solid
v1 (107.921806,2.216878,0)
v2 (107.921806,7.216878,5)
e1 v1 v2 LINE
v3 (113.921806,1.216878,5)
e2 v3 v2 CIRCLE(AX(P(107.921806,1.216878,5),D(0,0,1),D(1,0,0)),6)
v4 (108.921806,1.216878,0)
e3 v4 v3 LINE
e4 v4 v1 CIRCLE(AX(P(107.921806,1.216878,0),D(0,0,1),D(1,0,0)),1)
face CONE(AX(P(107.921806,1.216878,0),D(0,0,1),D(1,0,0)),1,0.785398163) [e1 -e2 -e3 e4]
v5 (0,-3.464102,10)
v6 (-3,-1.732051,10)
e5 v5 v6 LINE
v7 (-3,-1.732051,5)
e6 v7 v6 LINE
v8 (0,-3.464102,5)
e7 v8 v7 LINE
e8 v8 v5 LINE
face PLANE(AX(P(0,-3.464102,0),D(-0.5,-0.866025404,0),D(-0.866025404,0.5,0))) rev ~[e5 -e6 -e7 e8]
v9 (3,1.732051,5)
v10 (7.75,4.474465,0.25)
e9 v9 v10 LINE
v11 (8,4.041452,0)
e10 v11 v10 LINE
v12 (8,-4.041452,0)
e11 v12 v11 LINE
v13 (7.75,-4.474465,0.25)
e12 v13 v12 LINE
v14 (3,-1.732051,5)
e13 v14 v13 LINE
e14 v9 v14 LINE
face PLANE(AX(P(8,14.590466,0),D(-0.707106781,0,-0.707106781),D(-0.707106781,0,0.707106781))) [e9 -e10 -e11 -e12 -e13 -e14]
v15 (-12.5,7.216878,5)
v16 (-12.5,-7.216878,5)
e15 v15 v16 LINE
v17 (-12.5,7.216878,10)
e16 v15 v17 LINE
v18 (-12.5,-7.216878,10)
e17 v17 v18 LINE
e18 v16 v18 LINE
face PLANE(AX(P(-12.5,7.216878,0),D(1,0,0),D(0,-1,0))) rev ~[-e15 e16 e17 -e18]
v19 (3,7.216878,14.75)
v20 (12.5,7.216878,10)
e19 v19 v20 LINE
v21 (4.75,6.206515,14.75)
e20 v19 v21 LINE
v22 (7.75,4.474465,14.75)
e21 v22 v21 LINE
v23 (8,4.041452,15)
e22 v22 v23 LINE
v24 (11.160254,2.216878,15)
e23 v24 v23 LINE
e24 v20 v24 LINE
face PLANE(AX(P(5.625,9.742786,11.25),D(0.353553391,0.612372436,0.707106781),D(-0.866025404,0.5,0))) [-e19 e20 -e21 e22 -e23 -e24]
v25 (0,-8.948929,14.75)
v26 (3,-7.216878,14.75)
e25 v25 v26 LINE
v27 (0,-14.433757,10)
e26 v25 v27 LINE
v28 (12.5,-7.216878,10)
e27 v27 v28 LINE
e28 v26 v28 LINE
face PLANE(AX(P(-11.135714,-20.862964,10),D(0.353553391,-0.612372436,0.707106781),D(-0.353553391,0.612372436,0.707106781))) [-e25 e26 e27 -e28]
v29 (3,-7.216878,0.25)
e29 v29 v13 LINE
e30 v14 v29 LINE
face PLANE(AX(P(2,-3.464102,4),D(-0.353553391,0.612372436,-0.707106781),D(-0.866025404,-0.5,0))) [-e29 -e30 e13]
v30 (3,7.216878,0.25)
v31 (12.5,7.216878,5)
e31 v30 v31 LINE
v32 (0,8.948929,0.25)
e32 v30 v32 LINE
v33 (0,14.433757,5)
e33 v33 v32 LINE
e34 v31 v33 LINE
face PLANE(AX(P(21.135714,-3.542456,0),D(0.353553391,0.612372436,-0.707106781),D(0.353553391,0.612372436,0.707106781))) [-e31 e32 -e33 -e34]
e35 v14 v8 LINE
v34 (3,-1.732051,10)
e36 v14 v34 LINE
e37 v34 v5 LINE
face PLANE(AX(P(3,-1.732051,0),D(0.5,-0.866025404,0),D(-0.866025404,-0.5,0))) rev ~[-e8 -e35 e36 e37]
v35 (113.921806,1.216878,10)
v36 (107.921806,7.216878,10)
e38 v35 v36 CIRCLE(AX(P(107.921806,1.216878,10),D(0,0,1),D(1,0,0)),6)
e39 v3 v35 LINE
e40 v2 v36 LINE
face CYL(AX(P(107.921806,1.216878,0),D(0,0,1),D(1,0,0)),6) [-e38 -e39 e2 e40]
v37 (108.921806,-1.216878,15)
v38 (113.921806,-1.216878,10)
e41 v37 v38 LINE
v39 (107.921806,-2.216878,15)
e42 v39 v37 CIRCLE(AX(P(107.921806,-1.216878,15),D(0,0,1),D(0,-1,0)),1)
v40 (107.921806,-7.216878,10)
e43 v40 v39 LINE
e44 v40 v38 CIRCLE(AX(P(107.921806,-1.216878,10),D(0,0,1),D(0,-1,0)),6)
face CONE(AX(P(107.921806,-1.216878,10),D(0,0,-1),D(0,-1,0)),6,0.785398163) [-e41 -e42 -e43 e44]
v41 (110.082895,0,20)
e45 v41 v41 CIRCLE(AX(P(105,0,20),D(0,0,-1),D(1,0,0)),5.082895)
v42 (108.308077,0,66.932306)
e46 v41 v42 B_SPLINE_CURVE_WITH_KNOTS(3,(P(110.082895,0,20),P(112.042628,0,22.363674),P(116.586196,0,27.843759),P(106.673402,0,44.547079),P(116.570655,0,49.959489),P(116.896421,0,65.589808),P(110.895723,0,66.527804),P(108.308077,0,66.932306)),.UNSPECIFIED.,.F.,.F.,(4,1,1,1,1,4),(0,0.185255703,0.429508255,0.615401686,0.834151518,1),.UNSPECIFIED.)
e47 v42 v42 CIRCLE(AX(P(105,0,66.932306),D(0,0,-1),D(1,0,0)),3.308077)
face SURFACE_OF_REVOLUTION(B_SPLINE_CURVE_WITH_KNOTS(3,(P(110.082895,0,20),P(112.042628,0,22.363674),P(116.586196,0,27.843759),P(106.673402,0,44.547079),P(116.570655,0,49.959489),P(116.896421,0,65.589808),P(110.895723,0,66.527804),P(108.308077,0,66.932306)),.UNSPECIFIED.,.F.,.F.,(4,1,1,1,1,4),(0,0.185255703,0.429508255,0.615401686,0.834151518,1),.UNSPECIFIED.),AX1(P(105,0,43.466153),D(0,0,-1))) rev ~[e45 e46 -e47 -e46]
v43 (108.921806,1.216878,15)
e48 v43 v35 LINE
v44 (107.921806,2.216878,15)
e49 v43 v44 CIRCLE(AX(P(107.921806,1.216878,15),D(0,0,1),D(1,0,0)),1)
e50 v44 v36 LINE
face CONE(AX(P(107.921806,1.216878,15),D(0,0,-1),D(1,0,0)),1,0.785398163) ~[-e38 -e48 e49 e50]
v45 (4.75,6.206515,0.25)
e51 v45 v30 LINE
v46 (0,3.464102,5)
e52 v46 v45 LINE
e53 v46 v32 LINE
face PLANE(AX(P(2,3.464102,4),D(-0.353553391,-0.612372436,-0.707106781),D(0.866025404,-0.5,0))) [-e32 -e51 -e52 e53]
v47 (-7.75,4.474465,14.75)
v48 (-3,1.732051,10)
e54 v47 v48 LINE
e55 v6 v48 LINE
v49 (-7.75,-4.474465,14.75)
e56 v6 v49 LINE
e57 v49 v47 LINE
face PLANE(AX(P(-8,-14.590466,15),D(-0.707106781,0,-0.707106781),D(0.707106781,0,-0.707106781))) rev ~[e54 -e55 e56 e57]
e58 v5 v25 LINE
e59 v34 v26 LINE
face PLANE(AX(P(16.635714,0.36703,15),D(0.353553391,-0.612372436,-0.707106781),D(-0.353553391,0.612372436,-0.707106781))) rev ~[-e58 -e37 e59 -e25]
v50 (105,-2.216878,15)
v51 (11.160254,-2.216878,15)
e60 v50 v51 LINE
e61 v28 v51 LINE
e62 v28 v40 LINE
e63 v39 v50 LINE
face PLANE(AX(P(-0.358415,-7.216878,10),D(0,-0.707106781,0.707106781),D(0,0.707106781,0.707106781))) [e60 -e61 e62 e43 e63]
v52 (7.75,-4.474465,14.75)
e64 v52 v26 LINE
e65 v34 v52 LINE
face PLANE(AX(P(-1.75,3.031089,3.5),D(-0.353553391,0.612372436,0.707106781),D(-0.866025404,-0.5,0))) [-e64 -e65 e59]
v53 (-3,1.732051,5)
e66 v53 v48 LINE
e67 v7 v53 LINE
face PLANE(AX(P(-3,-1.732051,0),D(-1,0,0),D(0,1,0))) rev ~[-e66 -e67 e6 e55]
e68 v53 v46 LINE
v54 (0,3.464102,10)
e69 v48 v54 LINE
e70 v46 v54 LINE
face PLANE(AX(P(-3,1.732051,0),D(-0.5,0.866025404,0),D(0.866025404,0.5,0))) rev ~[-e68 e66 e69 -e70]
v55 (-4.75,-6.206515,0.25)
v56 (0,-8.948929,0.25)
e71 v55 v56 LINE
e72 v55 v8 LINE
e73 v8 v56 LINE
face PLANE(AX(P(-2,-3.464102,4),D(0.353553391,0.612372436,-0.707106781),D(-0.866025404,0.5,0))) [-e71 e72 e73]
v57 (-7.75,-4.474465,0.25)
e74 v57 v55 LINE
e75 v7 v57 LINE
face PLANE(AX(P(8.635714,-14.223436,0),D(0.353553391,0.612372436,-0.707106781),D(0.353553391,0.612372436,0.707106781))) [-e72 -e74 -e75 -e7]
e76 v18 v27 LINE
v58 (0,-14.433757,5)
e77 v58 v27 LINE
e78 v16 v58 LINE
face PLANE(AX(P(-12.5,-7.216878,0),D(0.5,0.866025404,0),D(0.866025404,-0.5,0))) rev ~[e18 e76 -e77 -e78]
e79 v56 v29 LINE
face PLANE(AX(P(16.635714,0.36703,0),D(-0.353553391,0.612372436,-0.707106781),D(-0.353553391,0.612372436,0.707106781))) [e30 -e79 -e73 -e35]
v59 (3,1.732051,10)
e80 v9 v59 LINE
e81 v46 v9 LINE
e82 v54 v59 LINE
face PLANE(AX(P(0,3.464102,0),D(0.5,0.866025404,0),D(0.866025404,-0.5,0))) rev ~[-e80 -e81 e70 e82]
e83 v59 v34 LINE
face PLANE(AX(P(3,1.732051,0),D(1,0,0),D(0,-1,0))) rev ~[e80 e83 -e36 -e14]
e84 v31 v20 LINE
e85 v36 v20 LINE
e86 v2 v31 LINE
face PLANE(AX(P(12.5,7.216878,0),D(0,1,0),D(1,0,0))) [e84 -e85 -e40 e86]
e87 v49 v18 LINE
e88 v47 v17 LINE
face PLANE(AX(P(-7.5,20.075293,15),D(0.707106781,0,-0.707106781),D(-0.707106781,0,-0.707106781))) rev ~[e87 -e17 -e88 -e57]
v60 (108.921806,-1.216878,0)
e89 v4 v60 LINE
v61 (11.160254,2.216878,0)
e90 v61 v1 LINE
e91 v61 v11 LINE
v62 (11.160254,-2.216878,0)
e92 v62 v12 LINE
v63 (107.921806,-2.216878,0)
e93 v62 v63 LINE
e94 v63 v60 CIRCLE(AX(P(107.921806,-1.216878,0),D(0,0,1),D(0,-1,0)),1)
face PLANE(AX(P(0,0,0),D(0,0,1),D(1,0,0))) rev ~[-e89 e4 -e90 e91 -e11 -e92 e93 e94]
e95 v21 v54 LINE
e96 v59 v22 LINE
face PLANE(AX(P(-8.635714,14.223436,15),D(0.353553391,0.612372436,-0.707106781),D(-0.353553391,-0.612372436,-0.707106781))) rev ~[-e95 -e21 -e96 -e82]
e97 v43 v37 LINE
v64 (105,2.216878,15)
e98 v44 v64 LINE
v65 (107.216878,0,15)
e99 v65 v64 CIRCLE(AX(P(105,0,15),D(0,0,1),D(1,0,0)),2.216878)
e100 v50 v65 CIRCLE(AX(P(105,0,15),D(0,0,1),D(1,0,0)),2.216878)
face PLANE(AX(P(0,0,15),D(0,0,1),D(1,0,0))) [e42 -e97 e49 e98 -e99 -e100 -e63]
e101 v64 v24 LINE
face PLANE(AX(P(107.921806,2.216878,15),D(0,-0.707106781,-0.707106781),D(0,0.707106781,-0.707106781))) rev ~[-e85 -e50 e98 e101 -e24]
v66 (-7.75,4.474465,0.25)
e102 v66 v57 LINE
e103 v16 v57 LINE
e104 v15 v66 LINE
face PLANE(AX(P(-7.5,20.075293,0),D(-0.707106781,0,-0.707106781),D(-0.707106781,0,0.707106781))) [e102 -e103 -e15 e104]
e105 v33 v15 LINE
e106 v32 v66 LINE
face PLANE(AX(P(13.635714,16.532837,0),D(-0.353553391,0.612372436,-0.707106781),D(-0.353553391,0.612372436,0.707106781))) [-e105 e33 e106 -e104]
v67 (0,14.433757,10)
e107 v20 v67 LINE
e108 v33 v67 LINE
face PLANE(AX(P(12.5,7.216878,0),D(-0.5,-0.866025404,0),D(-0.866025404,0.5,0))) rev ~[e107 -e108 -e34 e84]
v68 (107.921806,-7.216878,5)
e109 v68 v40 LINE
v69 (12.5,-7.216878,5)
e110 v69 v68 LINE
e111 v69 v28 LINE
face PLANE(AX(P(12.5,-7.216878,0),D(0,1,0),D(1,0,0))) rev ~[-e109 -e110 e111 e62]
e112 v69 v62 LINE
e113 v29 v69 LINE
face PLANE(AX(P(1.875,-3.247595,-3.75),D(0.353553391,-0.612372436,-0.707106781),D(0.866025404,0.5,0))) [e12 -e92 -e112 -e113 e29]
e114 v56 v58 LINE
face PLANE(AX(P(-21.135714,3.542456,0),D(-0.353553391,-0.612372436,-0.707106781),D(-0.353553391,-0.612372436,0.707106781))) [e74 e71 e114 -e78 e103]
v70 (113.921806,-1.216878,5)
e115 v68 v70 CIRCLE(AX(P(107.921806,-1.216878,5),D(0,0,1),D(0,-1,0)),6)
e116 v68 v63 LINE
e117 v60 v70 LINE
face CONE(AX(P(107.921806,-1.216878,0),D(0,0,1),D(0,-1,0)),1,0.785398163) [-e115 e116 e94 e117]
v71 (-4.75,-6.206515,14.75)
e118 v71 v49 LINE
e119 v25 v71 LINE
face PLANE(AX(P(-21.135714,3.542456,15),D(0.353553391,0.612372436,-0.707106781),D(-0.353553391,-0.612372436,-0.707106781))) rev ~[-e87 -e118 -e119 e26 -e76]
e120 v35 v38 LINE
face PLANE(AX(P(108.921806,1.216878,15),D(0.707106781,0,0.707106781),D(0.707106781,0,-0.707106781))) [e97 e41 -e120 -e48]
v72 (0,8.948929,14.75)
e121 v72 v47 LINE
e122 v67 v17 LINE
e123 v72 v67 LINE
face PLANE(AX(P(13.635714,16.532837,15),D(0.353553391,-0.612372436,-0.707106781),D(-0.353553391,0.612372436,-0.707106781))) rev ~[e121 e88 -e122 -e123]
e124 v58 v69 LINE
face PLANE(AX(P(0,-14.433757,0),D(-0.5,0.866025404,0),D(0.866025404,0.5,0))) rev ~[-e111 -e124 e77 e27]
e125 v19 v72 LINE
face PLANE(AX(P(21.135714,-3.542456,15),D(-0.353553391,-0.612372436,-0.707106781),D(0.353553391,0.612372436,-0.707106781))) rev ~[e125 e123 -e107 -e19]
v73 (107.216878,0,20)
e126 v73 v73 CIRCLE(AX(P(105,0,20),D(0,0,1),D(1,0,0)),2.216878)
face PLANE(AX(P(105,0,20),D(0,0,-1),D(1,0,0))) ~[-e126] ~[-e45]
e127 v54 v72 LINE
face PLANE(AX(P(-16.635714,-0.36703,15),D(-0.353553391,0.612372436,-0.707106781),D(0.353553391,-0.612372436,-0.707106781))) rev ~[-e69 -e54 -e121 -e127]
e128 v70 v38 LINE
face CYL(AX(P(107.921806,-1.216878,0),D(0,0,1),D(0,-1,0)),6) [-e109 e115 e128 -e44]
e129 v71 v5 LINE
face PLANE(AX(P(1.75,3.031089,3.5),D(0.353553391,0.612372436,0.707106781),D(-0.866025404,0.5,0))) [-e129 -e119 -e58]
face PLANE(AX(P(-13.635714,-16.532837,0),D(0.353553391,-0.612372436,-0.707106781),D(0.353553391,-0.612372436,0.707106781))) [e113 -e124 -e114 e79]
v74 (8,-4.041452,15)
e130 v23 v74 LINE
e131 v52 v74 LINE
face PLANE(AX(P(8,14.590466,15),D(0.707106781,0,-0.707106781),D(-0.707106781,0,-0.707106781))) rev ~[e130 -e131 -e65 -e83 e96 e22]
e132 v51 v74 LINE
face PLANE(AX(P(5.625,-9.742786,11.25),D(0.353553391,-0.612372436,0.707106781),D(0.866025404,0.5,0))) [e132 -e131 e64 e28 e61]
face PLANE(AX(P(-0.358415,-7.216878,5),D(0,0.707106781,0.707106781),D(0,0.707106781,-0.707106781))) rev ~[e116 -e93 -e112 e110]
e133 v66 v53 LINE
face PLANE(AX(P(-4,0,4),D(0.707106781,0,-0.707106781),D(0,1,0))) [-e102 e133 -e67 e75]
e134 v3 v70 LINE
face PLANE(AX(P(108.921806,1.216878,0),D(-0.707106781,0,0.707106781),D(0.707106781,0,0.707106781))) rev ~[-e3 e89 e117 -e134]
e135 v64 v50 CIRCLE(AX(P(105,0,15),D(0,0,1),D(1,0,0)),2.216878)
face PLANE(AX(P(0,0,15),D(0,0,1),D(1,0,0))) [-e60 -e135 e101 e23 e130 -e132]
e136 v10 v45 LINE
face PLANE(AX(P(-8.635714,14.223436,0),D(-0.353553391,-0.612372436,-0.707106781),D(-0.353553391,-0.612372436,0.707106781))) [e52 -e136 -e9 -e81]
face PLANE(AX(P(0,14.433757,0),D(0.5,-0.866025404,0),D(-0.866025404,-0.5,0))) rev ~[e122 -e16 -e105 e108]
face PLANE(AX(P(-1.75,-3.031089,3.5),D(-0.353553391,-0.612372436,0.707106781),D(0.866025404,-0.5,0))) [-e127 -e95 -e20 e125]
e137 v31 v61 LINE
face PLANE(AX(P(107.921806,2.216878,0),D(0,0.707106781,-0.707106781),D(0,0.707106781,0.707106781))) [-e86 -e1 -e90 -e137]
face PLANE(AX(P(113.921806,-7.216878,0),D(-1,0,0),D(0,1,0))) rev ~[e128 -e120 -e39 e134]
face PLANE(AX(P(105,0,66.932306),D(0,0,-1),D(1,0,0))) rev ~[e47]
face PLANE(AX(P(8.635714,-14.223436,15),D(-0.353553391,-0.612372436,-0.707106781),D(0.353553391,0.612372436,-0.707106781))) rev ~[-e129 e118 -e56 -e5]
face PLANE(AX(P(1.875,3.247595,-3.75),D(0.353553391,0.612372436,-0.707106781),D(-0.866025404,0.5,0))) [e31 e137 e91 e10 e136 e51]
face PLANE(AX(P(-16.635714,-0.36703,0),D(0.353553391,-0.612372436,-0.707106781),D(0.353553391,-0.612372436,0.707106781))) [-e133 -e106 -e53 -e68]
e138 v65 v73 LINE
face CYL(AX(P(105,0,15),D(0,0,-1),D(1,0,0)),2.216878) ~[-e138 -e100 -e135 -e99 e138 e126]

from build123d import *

# Parameters (mm, degrees)
F0_W          = 101.4218062162
F0_H          = 14.4337567297
F1_DEPTH      = 15
F2_R          = 6
F3_T1_DEPTH   = 2.4337567297
F3_T3_DEPTH   = 40.1505866094
F3_T5_DEPTH   = 40.1505866094
F3_T7_DEPTH   = 40.1505866094
F3_T12_DEPTH  = 108.2802211561
F3_T17_DEPTH  = 108.2802211561
F3_T20_ANGLE  = 90
F3_T24_DEPTH  = 40.1505866094
F3_T27_ANGLE  = 90
F3_T31_DEPTH  = 108.2802211561
F3_T36_DEPTH  = 108.2802211561
F3_T41_DEPTH  = 40.1505866094
F3_T46_DEPTH  = 29.1809314948
F3_T52_DEPTH  = 29.1809314948
F3_T58_DEPTH  = 29.1809314948
F3_T64_DEPTH  = 29.1809314948
F3_T70_DEPTH  = 29.1809314948
F3_T76_DEPTH  = 29.1809314948
F3_T82_DEPTH  = 108.2802211561
F3_T87_DEPTH  = 108.2802211561
F3_T90_ANGLE  = 90
F3_T94_DEPTH  = 40.1505866094
F3_T97_ANGLE  = 90
F3_T101_DEPTH = 108.2802211561
F3_T106_DEPTH = 108.2802211561
F3_T111_DEPTH = 40.1505866094
F3_T116_DEPTH = 29.1809314948
F3_T122_DEPTH = 29.1809314948
F3_T128_DEPTH = 29.1809314948
F3_T134_DEPTH = 29.1809314948
F3_T140_DEPTH = 29.1809314948
F3_T146_DEPTH = 29.1809314948
F4_R          = 2.2168783649
F5_DEPTH      = 5


# Not quite as in the source:
# - a fillet or chamfer that OpenCascade refuses, or shapes differently, is made with other operations: its cross-section is extruded or revolved along the edge and cut away or added


with BuildPart() as f1:
    # F0 (on Top) → F1 (new body)
    with BuildSketch(Plane.XY):
        Polygon((12.5, -7.2168783649), (12.5, 7.2168783649), (0, 14.4337567297), (-12.5, 7.2168783649), (-12.5, -7.2168783649), (0, -14.4337567297), align=None)
        Polygon((0, 3.4641016151), (3, 1.7320508076), (3, -1.7320508076), (0, -3.4641016151), (-3, -1.7320508076), (-3, 1.7320508076), align=None, mode=Mode.SUBTRACT)
        with Locations((63.2109031081, 0)):
            Rectangle(F0_W, F0_H)
    extrude(amount=F1_DEPTH)

    # F2
    f2_edges = [f1.edges().sort_by_distance(p)[0] for p in [
        (113.921806, -7.216878, 7.5),
        (113.921806, 7.216878, 7.5),
    ]]
    fillet(f2_edges, radius=F2_R)

    # F3: chamfer of 5 on 32 edges, made by hand

    # F3_s2 → F3_t1 (cut)
    with BuildSketch(Plane.XZ.offset(-1.2168783649)):
        Polygon((108.9218062162, 15), (113.9218062162, 10), (113.9218062162, 15), align=None)
        Polygon((108.9218062162, 0), (113.9218062162, 5), (113.9218062162, 0), align=None)
    extrude(amount=F3_T1_DEPTH, mode=Mode.SUBTRACT)

    # F3_s4 → F3_t3 (cut)
    with BuildSketch(Plane(origin=(-17.3857139903, 10.0376466523, 0), x_dir=(0, 0, 1), z_dir=(0.8660254038, -0.5, 0))):
        Polygon((15, 7.5), (10, 12.5), (15, 12.5), align=None)
        Polygon((0, 7.5), (5, 12.5), (0, 12.5), align=None)
    extrude(amount=F3_T3_DEPTH, mode=Mode.SUBTRACT)

    # F3_s6 → F3_t5 (cut)
    with BuildSketch(Plane.XZ.offset(-20.0752933047)):
        Polygon((-7.5, 15), (-12.5, 10), (-12.5, 15), align=None)
        Polygon((-7.5, 0), (-12.5, 5), (-12.5, 0), align=None)
    extrude(amount=F3_T5_DEPTH, mode=Mode.SUBTRACT)

    # F3_s8 → F3_t7 (cut)
    with BuildSketch(Plane(origin=(17.3857139903, 10.0376466523, 0), x_dir=(0, 0, 1), z_dir=(-0.8660254038, -0.5, 0))):
        Polygon((15, 7.5), (10, 12.5), (15, 12.5), align=None)
        Polygon((0, 7.5), (5, 12.5), (0, 12.5), align=None)
    extrude(amount=F3_T7_DEPTH, mode=Mode.SUBTRACT)


with BuildPart() as f3_tool10:
    # F3_s11 → F3_t12 (new body)
    with BuildSketch(Plane.YZ.offset(-0.3584149398)):
        Polygon((-7.2168783649, 10), (-2.2168783649, 15), (-7.2168783649, 15), align=None)
    extrude(amount=F3_T12_DEPTH)

    split(bisect_by=Plane(origin=(1.5, -2.5980762114, 0), x_dir=(0, 0, 1), z_dir=(-0.5, 0.8660254038, 0)), keep=Keep.TOP)


with BuildPart() as f1_1:
    add(f1.part)

    # F3_t9: cut F3_tool10
    add(f3_tool10.part, mode=Mode.SUBTRACT)


with BuildPart() as f3_tool15:
    # F3_s16 → F3_t17 (new body)
    with BuildSketch(Plane.YZ.offset(-0.3584149398)):
        Polygon((-7.2168783649, 10), (-2.2168783649, 15), (-7.2168783649, 15), align=None)
    extrude(amount=F3_T17_DEPTH)

    split(bisect_by=Plane(origin=(5.625, -9.7427857926, 11.25), x_dir=(0.8660254038, 0.5, 0), z_dir=(0.3535533906, -0.6123724357, 0.7071067812)), keep=Keep.TOP)


with BuildPart() as f1_2:
    add(f1_1.part)

    # F3_t14: cut F3_tool15
    add(f3_tool15.part, mode=Mode.SUBTRACT)

    # F3_s19 → F3_t20 (revolve, cut)
    with BuildSketch(Plane.YZ.offset(107.9218062162)):
        Polygon((-7.2168783649, 10), (-2.2168783649, 15), (-7.2168783649, 15), align=None)
    revolve(axis=Axis((107.9218062162, -1.2168783649, 15), (0, 0, 1)), revolution_arc=F3_T20_ANGLE, mode=Mode.SUBTRACT)


with BuildPart() as f3_tool22:
    # F3_s23 → F3_t24 (new body)
    with BuildSketch(Plane(origin=(-17.3857139903, -10.0376466523, 0), x_dir=(0, 0, 1), z_dir=(0.8660254038, 0.5, 0))):
        Polygon((10, 12.5), (15, 7.5), (15, 12.5), align=None)
    extrude(amount=F3_T24_DEPTH)

    split(bisect_by=Plane(origin=(0, -8.6084391824, 8.6084391824), x_dir=(1, 0, 0), z_dir=(0, -0.7071067812, 0.7071067812)), keep=Keep.TOP)


with BuildPart() as f1_3:
    add(f1_2.part)

    # F3_t21: cut F3_tool22
    add(f3_tool22.part, mode=Mode.SUBTRACT)

    # F3_s26 → F3_t27 (revolve, cut)
    with BuildSketch(Plane.XZ.offset(-1.2168783649)):
        Polygon((108.9218062162, 15), (113.9218062162, 10), (113.9218062162, 15), align=None)
    revolve(axis=Axis((107.9218062162, 1.2168783649, 15), (0, 0, 1)), revolution_arc=F3_T27_ANGLE, mode=Mode.SUBTRACT)


with BuildPart() as f3_tool29:
    # F3_s30 → F3_t31 (new body)
    with BuildSketch(Plane.YZ.offset(107.9218062162)):
        Polygon((2.2168783649, 15), (7.2168783649, 10), (7.2168783649, 15), align=None)
    extrude(amount=-F3_T31_DEPTH)

    split(bisect_by=Plane(origin=(5.625, 9.7427857926, 11.25), x_dir=(-0.8660254038, 0.5, 0), z_dir=(0.3535533906, 0.6123724357, 0.7071067812)), keep=Keep.TOP)


with BuildPart() as f1_4:
    add(f1_3.part)

    # F3_t28: cut F3_tool29
    add(f3_tool29.part, mode=Mode.SUBTRACT)


with BuildPart() as f3_tool34:
    # F3_s35 → F3_t36 (new body)
    with BuildSketch(Plane.YZ.offset(107.9218062162)):
        Polygon((2.2168783649, 15), (7.2168783649, 10), (7.2168783649, 15), align=None)
    extrude(amount=-F3_T36_DEPTH)

    split(bisect_by=Plane(origin=(1.5, 2.5980762114, 0), x_dir=(0, 0, 1), z_dir=(-0.5, -0.8660254038, 0)), keep=Keep.TOP)


with BuildPart() as f1_5:
    add(f1_4.part)

    # F3_t33: cut F3_tool34
    add(f3_tool34.part, mode=Mode.SUBTRACT)


with BuildPart() as f3_tool39:
    # F3_s40 → F3_t41 (new body)
    with BuildSketch(Plane(origin=(17.3857139903, -10.0376466523, 0), x_dir=(0, 0, 1), z_dir=(-0.8660254038, 0.5, 0))):
        Polygon((15, 7.5), (10, 12.5), (15, 12.5), align=None)
    extrude(amount=F3_T41_DEPTH)

    split(bisect_by=Plane(origin=(0, 8.6084391824, 8.6084391824), x_dir=(1, 0, 0), z_dir=(0, 0.7071067812, 0.7071067812)), keep=Keep.TOP)


with BuildPart() as f1_6:
    add(f1_5.part)

    # F3_t38: cut F3_tool39
    add(f3_tool39.part, mode=Mode.SUBTRACT)


with BuildPart() as f3_tool44:
    # F3_s45 → F3_t46 (new body)
    with BuildSketch(Plane(origin=(-12.6357139903, -7.2952328737, 0), x_dir=(0, 0, 1), z_dir=(0.8660254038, 0.5, 0))):
        Polygon((15, -8), (10, -3), (15, -3), align=None)
    extrude(amount=F3_T46_DEPTH)

    split(bisect_by=Plane(origin=(3.5, 0, 3.5), x_dir=(0, 1, 0), z_dir=(0.7071067812, 0, 0.7071067812)), keep=Keep.TOP)

    split(bisect_by=Plane(origin=(-1.75, -3.0310889132, 3.5), x_dir=(0.8660254038, -0.5, 0), z_dir=(-0.3535533906, -0.6123724357, 0.7071067812)), keep=Keep.TOP)


with BuildPart() as f1_7:
    add(f1_6.part)

    # F3_t43: cut F3_tool44
    add(f3_tool44.part, mode=Mode.SUBTRACT)


with BuildPart() as f3_tool50:
    # F3_s51 → F3_t52 (new body)
    with BuildSketch(Plane(origin=(-12.6357139903, 7.2952328737, 0), x_dir=(0, 0, 1), z_dir=(0.8660254038, -0.5, 0))):
        Polygon((15, -8), (10, -3), (15, -3), align=None)
    extrude(amount=F3_T52_DEPTH)

    split(bisect_by=Plane(origin=(-3.5, 0, 3.5), x_dir=(0, 1, 0), z_dir=(-0.7071067812, 0, 0.7071067812)), keep=Keep.TOP)

    split(bisect_by=Plane(origin=(1.75, -3.0310889132, 3.5), x_dir=(0.8660254038, 0.5, 0), z_dir=(0.3535533906, -0.6123724357, 0.7071067812)), keep=Keep.TOP)


with BuildPart() as f1_8:
    add(f1_7.part)

    # F3_t49: cut F3_tool50
    add(f3_tool50.part, mode=Mode.SUBTRACT)


with BuildPart() as f3_tool56:
    # F3_s57 → F3_t58 (new body)
    with BuildSketch(Plane.XZ.offset(-14.5904657474)):
        Polygon((8, 15), (3, 10), (3, 15), align=None)
    extrude(amount=F3_T58_DEPTH)

    split(bisect_by=Plane(origin=(-1.75, 3.0310889132, 3.5), x_dir=(-0.8660254038, -0.5, 0), z_dir=(-0.3535533906, 0.6123724357, 0.7071067812)), keep=Keep.TOP)

    split(bisect_by=Plane(origin=(-1.75, -3.0310889132, 3.5), x_dir=(0.8660254038, -0.5, 0), z_dir=(-0.3535533906, -0.6123724357, 0.7071067812)), keep=Keep.TOP)


with BuildPart() as f1_9:
    add(f1_8.part)

    # F3_t55: cut F3_tool56
    add(f3_tool56.part, mode=Mode.SUBTRACT)


with BuildPart() as f3_tool62:
    # F3_s63 → F3_t64 (new body)
    with BuildSketch(Plane(origin=(12.6357139903, 7.2952328737, 0), x_dir=(0, 0, 1), z_dir=(-0.8660254038, -0.5, 0))):
        Polygon((15, -8), (10, -3), (15, -3), align=None)
    extrude(amount=F3_T64_DEPTH)

    split(bisect_by=Plane(origin=(-3.5, 0, 3.5), x_dir=(0, 1, 0), z_dir=(-0.7071067812, 0, 0.7071067812)), keep=Keep.TOP)

    split(bisect_by=Plane(origin=(1.75, 3.0310889132, 3.5), x_dir=(-0.8660254038, 0.5, 0), z_dir=(0.3535533906, 0.6123724357, 0.7071067812)), keep=Keep.TOP)


with BuildPart() as f1_10:
    add(f1_9.part)

    # F3_t61: cut F3_tool62
    add(f3_tool62.part, mode=Mode.SUBTRACT)


with BuildPart() as f3_tool68:
    # F3_s69 → F3_t70 (new body)
    with BuildSketch(Plane(origin=(12.6357139903, -7.2952328737, 0), x_dir=(0, 0, 1), z_dir=(-0.8660254038, 0.5, 0))):
        Polygon((15, -8), (10, -3), (15, -3), align=None)
    extrude(amount=F3_T70_DEPTH)

    split(bisect_by=Plane(origin=(-1.75, 3.0310889132, 3.5), x_dir=(-0.8660254038, -0.5, 0), z_dir=(-0.3535533906, 0.6123724357, 0.7071067812)), keep=Keep.TOP)

    split(bisect_by=Plane(origin=(3.5, 0, 3.5), x_dir=(0, 1, 0), z_dir=(0.7071067812, 0, 0.7071067812)), keep=Keep.TOP)


with BuildPart() as f1_11:
    add(f1_10.part)

    # F3_t67: cut F3_tool68
    add(f3_tool68.part, mode=Mode.SUBTRACT)


with BuildPart() as f3_tool74:
    # F3_s75 → F3_t76 (new body)
    with BuildSketch(Plane.XZ.offset(14.5904657474)):
        Polygon((-8, 15), (-3, 10), (-3, 15), align=None)
    extrude(amount=-F3_T76_DEPTH)

    split(bisect_by=Plane(origin=(1.75, 3.0310889132, 3.5), x_dir=(-0.8660254038, 0.5, 0), z_dir=(0.3535533906, 0.6123724357, 0.7071067812)), keep=Keep.TOP)

    split(bisect_by=Plane(origin=(1.75, -3.0310889132, 3.5), x_dir=(0.8660254038, 0.5, 0), z_dir=(0.3535533906, -0.6123724357, 0.7071067812)), keep=Keep.TOP)


with BuildPart() as f1_12:
    add(f1_11.part)

    # F3_t73: cut F3_tool74
    add(f3_tool74.part, mode=Mode.SUBTRACT)


with BuildPart() as f3_tool80:
    # F3_s81 → F3_t82 (new body)
    with BuildSketch(Plane.YZ.offset(-0.3584149398)):
        Polygon((-7.2168783649, 5), (-2.2168783649, 0), (-7.2168783649, 0), align=None)
    extrude(amount=F3_T82_DEPTH)

    split(bisect_by=Plane(origin=(1.5, -2.5980762114, 0), x_dir=(0, 0, 1), z_dir=(-0.5, 0.8660254038, 0)), keep=Keep.TOP)


with BuildPart() as f1_13:
    add(f1_12.part)

    # F3_t79: cut F3_tool80
    add(f3_tool80.part, mode=Mode.SUBTRACT)


with BuildPart() as f3_tool85:
    # F3_s86 → F3_t87 (new body)
    with BuildSketch(Plane.YZ.offset(-0.3584149398)):
        Polygon((-7.2168783649, 5), (-2.2168783649, 0), (-7.2168783649, 0), align=None)
    extrude(amount=F3_T87_DEPTH)

    split(bisect_by=Plane(origin=(1.875, -3.2475952642, -3.75), x_dir=(0.8660254038, 0.5, 0), z_dir=(0.3535533906, -0.6123724357, -0.7071067812)), keep=Keep.TOP)


with BuildPart() as f1_14:
    add(f1_13.part)

    # F3_t84: cut F3_tool85
    add(f3_tool85.part, mode=Mode.SUBTRACT)

    # F3_s89 → F3_t90 (revolve, cut)
    with BuildSketch(Plane.YZ.offset(107.9218062162)):
        Polygon((-2.2168783649, 0), (-7.2168783649, 5), (-7.2168783649, 0), align=None)
    revolve(axis=Axis((107.9218062162, -1.2168783649, 0), (0, 0, 1)), revolution_arc=F3_T90_ANGLE, mode=Mode.SUBTRACT)


with BuildPart() as f3_tool92:
    # F3_s93 → F3_t94 (new body)
    with BuildSketch(Plane(origin=(-17.3857139903, -10.0376466523, 0), x_dir=(0, 0, 1), z_dir=(0.8660254038, 0.5, 0))):
        Polygon((0, 7.5), (5, 12.5), (0, 12.5), align=None)
    extrude(amount=F3_T94_DEPTH)

    split(bisect_by=Plane(origin=(0, -1.1084391824, -1.1084391824), x_dir=(1, 0, 0), z_dir=(0, -0.7071067812, -0.7071067812)), keep=Keep.TOP)


with BuildPart() as f1_15:
    add(f1_14.part)

    # F3_t91: cut F3_tool92
    add(f3_tool92.part, mode=Mode.SUBTRACT)

    # F3_s96 → F3_t97 (revolve, cut)
    with BuildSketch(Plane.XZ.offset(-1.2168783649)):
        Polygon((108.9218062162, 0), (113.9218062162, 5), (113.9218062162, 0), align=None)
    revolve(axis=Axis((107.9218062162, 1.2168783649, 0), (0, 0, 1)), revolution_arc=F3_T97_ANGLE, mode=Mode.SUBTRACT)


with BuildPart() as f3_tool99:
    # F3_s100 → F3_t101 (new body)
    with BuildSketch(Plane.YZ.offset(107.9218062162)):
        Polygon((2.2168783649, 0), (7.2168783649, 5), (7.2168783649, 0), align=None)
    extrude(amount=-F3_T101_DEPTH)

    split(bisect_by=Plane(origin=(1.875, 3.2475952642, -3.75), x_dir=(-0.8660254038, 0.5, 0), z_dir=(0.3535533906, 0.6123724357, -0.7071067812)), keep=Keep.TOP)


with BuildPart() as f1_16:
    add(f1_15.part)

    # F3_t98: cut F3_tool99
    add(f3_tool99.part, mode=Mode.SUBTRACT)


with BuildPart() as f3_tool104:
    # F3_s105 → F3_t106 (new body)
    with BuildSketch(Plane.YZ.offset(107.9218062162)):
        Polygon((2.2168783649, 0), (7.2168783649, 5), (7.2168783649, 0), align=None)
    extrude(amount=-F3_T106_DEPTH)

    split(bisect_by=Plane(origin=(1.5, 2.5980762114, 0), x_dir=(0, 0, 1), z_dir=(-0.5, -0.8660254038, 0)), keep=Keep.TOP)


with BuildPart() as f1_17:
    add(f1_16.part)

    # F3_t103: cut F3_tool104
    add(f3_tool104.part, mode=Mode.SUBTRACT)


with BuildPart() as f3_tool109:
    # F3_s110 → F3_t111 (new body)
    with BuildSketch(Plane(origin=(17.3857139903, -10.0376466523, 0), x_dir=(0, 0, 1), z_dir=(-0.8660254038, 0.5, 0))):
        Polygon((0, 7.5), (5, 12.5), (0, 12.5), align=None)
    extrude(amount=F3_T111_DEPTH)

    split(bisect_by=Plane(origin=(0, 1.1084391824, -1.1084391824), x_dir=(1, 0, 0), z_dir=(0, 0.7071067812, -0.7071067812)), keep=Keep.TOP)


with BuildPart() as f1_18:
    add(f1_17.part)

    # F3_t108: cut F3_tool109
    add(f3_tool109.part, mode=Mode.SUBTRACT)


with BuildPart() as f3_tool114:
    # F3_s115 → F3_t116 (new body)
    with BuildSketch(Plane(origin=(-12.6357139903, -7.2952328737, 0), x_dir=(0, 0, 1), z_dir=(0.8660254038, 0.5, 0))):
        Polygon((0, -8), (5, -3), (0, -3), align=None)
    extrude(amount=F3_T116_DEPTH)

    split(bisect_by=Plane(origin=(-4, 0, 4), x_dir=(0, 1, 0), z_dir=(0.7071067812, 0, -0.7071067812)), keep=Keep.TOP)

    split(bisect_by=Plane(origin=(2, 3.4641016151, 4), x_dir=(0.8660254038, -0.5, 0), z_dir=(-0.3535533906, -0.6123724357, -0.7071067812)), keep=Keep.TOP)


with BuildPart() as f1_19:
    add(f1_18.part)

    # F3_t113: cut F3_tool114
    add(f3_tool114.part, mode=Mode.SUBTRACT)


with BuildPart() as f3_tool120:
    # F3_s121 → F3_t122 (new body)
    with BuildSketch(Plane(origin=(-12.6357139903, 7.2952328737, 0), x_dir=(0, 0, 1), z_dir=(0.8660254038, -0.5, 0))):
        Polygon((0, -8), (5, -3), (0, -3), align=None)
    extrude(amount=F3_T122_DEPTH)

    split(bisect_by=Plane(origin=(-2, 3.4641016151, 4), x_dir=(0.8660254038, 0.5, 0), z_dir=(0.3535533906, -0.6123724357, -0.7071067812)), keep=Keep.TOP)

    split(bisect_by=Plane(origin=(4, 0, 4), x_dir=(0, 1, 0), z_dir=(-0.7071067812, 0, -0.7071067812)), keep=Keep.TOP)


with BuildPart() as f1_20:
    add(f1_19.part)

    # F3_t119: cut F3_tool120
    add(f3_tool120.part, mode=Mode.SUBTRACT)


with BuildPart() as f3_tool126:
    # F3_s127 → F3_t128 (new body)
    with BuildSketch(Plane.XZ.offset(-14.5904657474)):
        Polygon((8, 0), (3, 5), (3, 0), align=None)
    extrude(amount=F3_T128_DEPTH)

    split(bisect_by=Plane(origin=(2, -3.4641016151, 4), x_dir=(-0.8660254038, -0.5, 0), z_dir=(-0.3535533906, 0.6123724357, -0.7071067812)), keep=Keep.TOP)

    split(bisect_by=Plane(origin=(2, 3.4641016151, 4), x_dir=(0.8660254038, -0.5, 0), z_dir=(-0.3535533906, -0.6123724357, -0.7071067812)), keep=Keep.TOP)


with BuildPart() as f1_21:
    add(f1_20.part)

    # F3_t125: cut F3_tool126
    add(f3_tool126.part, mode=Mode.SUBTRACT)


with BuildPart() as f3_tool132:
    # F3_s133 → F3_t134 (new body)
    with BuildSketch(Plane(origin=(12.6357139903, 7.2952328737, 0), x_dir=(0, 0, 1), z_dir=(-0.8660254038, -0.5, 0))):
        Polygon((0, -8), (5, -3), (0, -3), align=None)
    extrude(amount=F3_T134_DEPTH)

    split(bisect_by=Plane(origin=(-2, -3.4641016151, 4), x_dir=(-0.8660254038, 0.5, 0), z_dir=(0.3535533906, 0.6123724357, -0.7071067812)), keep=Keep.TOP)

    split(bisect_by=Plane(origin=(4, 0, 4), x_dir=(0, 1, 0), z_dir=(-0.7071067812, 0, -0.7071067812)), keep=Keep.TOP)


with BuildPart() as f1_22:
    add(f1_21.part)

    # F3_t131: cut F3_tool132
    add(f3_tool132.part, mode=Mode.SUBTRACT)


with BuildPart() as f3_tool138:
    # F3_s139 → F3_t140 (new body)
    with BuildSketch(Plane(origin=(12.6357139903, -7.2952328737, 0), x_dir=(0, 0, 1), z_dir=(-0.8660254038, 0.5, 0))):
        Polygon((0, -8), (5, -3), (0, -3), align=None)
    extrude(amount=F3_T140_DEPTH)

    split(bisect_by=Plane(origin=(2, -3.4641016151, 4), x_dir=(-0.8660254038, -0.5, 0), z_dir=(-0.3535533906, 0.6123724357, -0.7071067812)), keep=Keep.TOP)

    split(bisect_by=Plane(origin=(-4, 0, 4), x_dir=(0, 1, 0), z_dir=(0.7071067812, 0, -0.7071067812)), keep=Keep.TOP)


with BuildPart() as f1_23:
    add(f1_22.part)

    # F3_t137: cut F3_tool138
    add(f3_tool138.part, mode=Mode.SUBTRACT)


with BuildPart() as f3_tool144:
    # F3_s145 → F3_t146 (new body)
    with BuildSketch(Plane.XZ.offset(14.5904657474)):
        Polygon((-8, 0), (-3, 5), (-3, 0), align=None)
    extrude(amount=-F3_T146_DEPTH)

    split(bisect_by=Plane(origin=(-2, -3.4641016151, 4), x_dir=(-0.8660254038, 0.5, 0), z_dir=(0.3535533906, 0.6123724357, -0.7071067812)), keep=Keep.TOP)

    split(bisect_by=Plane(origin=(-2, 3.4641016151, 4), x_dir=(0.8660254038, 0.5, 0), z_dir=(0.3535533906, -0.6123724357, -0.7071067812)), keep=Keep.TOP)


with BuildPart() as f1_24:
    add(f1_23.part)

    # F3_t143: cut F3_tool144
    add(f3_tool144.part, mode=Mode.SUBTRACT)

    # F4 (on face) → F5 (join)
    with BuildSketch(Plane.XY.offset(15)):
        with Locations((105, 0)):
            Circle(F4_R)
    extrude(amount=F5_DEPTH)

    # F6 (on Front) → F7 (revolve)
    with BuildSketch(Plane.XZ):
        with BuildLine():
            Line((108.3080768585, 66.9323056936), (105, 66.9323056936))
            Line((105, 66.9323056936), (105, 20))
            Line((105, 20), (110.0828945637, 20))
            add(Edge.make_bspline(
                [(110.0828945637, 20), (112.0426276757, 22.363673848), (116.5861959485, 27.8437592299), (106.6734024331, 44.5470793569), (116.570655373, 49.9594893214), (116.8964211839, 65.5898079545), (110.8957227351, 66.5278041763), (108.3080768585, 66.9323056936)],
                knots=[0, 0, 0, 0, 0.1852557032, 0.4295082555, 0.6154016859, 0.8341515178, 1, 1, 1, 1], degree=3))
        make_face()
    revolve(axis=Axis((105, 0, 43.4661528468), (0, 0, -1)))


solid = f1_24.part
